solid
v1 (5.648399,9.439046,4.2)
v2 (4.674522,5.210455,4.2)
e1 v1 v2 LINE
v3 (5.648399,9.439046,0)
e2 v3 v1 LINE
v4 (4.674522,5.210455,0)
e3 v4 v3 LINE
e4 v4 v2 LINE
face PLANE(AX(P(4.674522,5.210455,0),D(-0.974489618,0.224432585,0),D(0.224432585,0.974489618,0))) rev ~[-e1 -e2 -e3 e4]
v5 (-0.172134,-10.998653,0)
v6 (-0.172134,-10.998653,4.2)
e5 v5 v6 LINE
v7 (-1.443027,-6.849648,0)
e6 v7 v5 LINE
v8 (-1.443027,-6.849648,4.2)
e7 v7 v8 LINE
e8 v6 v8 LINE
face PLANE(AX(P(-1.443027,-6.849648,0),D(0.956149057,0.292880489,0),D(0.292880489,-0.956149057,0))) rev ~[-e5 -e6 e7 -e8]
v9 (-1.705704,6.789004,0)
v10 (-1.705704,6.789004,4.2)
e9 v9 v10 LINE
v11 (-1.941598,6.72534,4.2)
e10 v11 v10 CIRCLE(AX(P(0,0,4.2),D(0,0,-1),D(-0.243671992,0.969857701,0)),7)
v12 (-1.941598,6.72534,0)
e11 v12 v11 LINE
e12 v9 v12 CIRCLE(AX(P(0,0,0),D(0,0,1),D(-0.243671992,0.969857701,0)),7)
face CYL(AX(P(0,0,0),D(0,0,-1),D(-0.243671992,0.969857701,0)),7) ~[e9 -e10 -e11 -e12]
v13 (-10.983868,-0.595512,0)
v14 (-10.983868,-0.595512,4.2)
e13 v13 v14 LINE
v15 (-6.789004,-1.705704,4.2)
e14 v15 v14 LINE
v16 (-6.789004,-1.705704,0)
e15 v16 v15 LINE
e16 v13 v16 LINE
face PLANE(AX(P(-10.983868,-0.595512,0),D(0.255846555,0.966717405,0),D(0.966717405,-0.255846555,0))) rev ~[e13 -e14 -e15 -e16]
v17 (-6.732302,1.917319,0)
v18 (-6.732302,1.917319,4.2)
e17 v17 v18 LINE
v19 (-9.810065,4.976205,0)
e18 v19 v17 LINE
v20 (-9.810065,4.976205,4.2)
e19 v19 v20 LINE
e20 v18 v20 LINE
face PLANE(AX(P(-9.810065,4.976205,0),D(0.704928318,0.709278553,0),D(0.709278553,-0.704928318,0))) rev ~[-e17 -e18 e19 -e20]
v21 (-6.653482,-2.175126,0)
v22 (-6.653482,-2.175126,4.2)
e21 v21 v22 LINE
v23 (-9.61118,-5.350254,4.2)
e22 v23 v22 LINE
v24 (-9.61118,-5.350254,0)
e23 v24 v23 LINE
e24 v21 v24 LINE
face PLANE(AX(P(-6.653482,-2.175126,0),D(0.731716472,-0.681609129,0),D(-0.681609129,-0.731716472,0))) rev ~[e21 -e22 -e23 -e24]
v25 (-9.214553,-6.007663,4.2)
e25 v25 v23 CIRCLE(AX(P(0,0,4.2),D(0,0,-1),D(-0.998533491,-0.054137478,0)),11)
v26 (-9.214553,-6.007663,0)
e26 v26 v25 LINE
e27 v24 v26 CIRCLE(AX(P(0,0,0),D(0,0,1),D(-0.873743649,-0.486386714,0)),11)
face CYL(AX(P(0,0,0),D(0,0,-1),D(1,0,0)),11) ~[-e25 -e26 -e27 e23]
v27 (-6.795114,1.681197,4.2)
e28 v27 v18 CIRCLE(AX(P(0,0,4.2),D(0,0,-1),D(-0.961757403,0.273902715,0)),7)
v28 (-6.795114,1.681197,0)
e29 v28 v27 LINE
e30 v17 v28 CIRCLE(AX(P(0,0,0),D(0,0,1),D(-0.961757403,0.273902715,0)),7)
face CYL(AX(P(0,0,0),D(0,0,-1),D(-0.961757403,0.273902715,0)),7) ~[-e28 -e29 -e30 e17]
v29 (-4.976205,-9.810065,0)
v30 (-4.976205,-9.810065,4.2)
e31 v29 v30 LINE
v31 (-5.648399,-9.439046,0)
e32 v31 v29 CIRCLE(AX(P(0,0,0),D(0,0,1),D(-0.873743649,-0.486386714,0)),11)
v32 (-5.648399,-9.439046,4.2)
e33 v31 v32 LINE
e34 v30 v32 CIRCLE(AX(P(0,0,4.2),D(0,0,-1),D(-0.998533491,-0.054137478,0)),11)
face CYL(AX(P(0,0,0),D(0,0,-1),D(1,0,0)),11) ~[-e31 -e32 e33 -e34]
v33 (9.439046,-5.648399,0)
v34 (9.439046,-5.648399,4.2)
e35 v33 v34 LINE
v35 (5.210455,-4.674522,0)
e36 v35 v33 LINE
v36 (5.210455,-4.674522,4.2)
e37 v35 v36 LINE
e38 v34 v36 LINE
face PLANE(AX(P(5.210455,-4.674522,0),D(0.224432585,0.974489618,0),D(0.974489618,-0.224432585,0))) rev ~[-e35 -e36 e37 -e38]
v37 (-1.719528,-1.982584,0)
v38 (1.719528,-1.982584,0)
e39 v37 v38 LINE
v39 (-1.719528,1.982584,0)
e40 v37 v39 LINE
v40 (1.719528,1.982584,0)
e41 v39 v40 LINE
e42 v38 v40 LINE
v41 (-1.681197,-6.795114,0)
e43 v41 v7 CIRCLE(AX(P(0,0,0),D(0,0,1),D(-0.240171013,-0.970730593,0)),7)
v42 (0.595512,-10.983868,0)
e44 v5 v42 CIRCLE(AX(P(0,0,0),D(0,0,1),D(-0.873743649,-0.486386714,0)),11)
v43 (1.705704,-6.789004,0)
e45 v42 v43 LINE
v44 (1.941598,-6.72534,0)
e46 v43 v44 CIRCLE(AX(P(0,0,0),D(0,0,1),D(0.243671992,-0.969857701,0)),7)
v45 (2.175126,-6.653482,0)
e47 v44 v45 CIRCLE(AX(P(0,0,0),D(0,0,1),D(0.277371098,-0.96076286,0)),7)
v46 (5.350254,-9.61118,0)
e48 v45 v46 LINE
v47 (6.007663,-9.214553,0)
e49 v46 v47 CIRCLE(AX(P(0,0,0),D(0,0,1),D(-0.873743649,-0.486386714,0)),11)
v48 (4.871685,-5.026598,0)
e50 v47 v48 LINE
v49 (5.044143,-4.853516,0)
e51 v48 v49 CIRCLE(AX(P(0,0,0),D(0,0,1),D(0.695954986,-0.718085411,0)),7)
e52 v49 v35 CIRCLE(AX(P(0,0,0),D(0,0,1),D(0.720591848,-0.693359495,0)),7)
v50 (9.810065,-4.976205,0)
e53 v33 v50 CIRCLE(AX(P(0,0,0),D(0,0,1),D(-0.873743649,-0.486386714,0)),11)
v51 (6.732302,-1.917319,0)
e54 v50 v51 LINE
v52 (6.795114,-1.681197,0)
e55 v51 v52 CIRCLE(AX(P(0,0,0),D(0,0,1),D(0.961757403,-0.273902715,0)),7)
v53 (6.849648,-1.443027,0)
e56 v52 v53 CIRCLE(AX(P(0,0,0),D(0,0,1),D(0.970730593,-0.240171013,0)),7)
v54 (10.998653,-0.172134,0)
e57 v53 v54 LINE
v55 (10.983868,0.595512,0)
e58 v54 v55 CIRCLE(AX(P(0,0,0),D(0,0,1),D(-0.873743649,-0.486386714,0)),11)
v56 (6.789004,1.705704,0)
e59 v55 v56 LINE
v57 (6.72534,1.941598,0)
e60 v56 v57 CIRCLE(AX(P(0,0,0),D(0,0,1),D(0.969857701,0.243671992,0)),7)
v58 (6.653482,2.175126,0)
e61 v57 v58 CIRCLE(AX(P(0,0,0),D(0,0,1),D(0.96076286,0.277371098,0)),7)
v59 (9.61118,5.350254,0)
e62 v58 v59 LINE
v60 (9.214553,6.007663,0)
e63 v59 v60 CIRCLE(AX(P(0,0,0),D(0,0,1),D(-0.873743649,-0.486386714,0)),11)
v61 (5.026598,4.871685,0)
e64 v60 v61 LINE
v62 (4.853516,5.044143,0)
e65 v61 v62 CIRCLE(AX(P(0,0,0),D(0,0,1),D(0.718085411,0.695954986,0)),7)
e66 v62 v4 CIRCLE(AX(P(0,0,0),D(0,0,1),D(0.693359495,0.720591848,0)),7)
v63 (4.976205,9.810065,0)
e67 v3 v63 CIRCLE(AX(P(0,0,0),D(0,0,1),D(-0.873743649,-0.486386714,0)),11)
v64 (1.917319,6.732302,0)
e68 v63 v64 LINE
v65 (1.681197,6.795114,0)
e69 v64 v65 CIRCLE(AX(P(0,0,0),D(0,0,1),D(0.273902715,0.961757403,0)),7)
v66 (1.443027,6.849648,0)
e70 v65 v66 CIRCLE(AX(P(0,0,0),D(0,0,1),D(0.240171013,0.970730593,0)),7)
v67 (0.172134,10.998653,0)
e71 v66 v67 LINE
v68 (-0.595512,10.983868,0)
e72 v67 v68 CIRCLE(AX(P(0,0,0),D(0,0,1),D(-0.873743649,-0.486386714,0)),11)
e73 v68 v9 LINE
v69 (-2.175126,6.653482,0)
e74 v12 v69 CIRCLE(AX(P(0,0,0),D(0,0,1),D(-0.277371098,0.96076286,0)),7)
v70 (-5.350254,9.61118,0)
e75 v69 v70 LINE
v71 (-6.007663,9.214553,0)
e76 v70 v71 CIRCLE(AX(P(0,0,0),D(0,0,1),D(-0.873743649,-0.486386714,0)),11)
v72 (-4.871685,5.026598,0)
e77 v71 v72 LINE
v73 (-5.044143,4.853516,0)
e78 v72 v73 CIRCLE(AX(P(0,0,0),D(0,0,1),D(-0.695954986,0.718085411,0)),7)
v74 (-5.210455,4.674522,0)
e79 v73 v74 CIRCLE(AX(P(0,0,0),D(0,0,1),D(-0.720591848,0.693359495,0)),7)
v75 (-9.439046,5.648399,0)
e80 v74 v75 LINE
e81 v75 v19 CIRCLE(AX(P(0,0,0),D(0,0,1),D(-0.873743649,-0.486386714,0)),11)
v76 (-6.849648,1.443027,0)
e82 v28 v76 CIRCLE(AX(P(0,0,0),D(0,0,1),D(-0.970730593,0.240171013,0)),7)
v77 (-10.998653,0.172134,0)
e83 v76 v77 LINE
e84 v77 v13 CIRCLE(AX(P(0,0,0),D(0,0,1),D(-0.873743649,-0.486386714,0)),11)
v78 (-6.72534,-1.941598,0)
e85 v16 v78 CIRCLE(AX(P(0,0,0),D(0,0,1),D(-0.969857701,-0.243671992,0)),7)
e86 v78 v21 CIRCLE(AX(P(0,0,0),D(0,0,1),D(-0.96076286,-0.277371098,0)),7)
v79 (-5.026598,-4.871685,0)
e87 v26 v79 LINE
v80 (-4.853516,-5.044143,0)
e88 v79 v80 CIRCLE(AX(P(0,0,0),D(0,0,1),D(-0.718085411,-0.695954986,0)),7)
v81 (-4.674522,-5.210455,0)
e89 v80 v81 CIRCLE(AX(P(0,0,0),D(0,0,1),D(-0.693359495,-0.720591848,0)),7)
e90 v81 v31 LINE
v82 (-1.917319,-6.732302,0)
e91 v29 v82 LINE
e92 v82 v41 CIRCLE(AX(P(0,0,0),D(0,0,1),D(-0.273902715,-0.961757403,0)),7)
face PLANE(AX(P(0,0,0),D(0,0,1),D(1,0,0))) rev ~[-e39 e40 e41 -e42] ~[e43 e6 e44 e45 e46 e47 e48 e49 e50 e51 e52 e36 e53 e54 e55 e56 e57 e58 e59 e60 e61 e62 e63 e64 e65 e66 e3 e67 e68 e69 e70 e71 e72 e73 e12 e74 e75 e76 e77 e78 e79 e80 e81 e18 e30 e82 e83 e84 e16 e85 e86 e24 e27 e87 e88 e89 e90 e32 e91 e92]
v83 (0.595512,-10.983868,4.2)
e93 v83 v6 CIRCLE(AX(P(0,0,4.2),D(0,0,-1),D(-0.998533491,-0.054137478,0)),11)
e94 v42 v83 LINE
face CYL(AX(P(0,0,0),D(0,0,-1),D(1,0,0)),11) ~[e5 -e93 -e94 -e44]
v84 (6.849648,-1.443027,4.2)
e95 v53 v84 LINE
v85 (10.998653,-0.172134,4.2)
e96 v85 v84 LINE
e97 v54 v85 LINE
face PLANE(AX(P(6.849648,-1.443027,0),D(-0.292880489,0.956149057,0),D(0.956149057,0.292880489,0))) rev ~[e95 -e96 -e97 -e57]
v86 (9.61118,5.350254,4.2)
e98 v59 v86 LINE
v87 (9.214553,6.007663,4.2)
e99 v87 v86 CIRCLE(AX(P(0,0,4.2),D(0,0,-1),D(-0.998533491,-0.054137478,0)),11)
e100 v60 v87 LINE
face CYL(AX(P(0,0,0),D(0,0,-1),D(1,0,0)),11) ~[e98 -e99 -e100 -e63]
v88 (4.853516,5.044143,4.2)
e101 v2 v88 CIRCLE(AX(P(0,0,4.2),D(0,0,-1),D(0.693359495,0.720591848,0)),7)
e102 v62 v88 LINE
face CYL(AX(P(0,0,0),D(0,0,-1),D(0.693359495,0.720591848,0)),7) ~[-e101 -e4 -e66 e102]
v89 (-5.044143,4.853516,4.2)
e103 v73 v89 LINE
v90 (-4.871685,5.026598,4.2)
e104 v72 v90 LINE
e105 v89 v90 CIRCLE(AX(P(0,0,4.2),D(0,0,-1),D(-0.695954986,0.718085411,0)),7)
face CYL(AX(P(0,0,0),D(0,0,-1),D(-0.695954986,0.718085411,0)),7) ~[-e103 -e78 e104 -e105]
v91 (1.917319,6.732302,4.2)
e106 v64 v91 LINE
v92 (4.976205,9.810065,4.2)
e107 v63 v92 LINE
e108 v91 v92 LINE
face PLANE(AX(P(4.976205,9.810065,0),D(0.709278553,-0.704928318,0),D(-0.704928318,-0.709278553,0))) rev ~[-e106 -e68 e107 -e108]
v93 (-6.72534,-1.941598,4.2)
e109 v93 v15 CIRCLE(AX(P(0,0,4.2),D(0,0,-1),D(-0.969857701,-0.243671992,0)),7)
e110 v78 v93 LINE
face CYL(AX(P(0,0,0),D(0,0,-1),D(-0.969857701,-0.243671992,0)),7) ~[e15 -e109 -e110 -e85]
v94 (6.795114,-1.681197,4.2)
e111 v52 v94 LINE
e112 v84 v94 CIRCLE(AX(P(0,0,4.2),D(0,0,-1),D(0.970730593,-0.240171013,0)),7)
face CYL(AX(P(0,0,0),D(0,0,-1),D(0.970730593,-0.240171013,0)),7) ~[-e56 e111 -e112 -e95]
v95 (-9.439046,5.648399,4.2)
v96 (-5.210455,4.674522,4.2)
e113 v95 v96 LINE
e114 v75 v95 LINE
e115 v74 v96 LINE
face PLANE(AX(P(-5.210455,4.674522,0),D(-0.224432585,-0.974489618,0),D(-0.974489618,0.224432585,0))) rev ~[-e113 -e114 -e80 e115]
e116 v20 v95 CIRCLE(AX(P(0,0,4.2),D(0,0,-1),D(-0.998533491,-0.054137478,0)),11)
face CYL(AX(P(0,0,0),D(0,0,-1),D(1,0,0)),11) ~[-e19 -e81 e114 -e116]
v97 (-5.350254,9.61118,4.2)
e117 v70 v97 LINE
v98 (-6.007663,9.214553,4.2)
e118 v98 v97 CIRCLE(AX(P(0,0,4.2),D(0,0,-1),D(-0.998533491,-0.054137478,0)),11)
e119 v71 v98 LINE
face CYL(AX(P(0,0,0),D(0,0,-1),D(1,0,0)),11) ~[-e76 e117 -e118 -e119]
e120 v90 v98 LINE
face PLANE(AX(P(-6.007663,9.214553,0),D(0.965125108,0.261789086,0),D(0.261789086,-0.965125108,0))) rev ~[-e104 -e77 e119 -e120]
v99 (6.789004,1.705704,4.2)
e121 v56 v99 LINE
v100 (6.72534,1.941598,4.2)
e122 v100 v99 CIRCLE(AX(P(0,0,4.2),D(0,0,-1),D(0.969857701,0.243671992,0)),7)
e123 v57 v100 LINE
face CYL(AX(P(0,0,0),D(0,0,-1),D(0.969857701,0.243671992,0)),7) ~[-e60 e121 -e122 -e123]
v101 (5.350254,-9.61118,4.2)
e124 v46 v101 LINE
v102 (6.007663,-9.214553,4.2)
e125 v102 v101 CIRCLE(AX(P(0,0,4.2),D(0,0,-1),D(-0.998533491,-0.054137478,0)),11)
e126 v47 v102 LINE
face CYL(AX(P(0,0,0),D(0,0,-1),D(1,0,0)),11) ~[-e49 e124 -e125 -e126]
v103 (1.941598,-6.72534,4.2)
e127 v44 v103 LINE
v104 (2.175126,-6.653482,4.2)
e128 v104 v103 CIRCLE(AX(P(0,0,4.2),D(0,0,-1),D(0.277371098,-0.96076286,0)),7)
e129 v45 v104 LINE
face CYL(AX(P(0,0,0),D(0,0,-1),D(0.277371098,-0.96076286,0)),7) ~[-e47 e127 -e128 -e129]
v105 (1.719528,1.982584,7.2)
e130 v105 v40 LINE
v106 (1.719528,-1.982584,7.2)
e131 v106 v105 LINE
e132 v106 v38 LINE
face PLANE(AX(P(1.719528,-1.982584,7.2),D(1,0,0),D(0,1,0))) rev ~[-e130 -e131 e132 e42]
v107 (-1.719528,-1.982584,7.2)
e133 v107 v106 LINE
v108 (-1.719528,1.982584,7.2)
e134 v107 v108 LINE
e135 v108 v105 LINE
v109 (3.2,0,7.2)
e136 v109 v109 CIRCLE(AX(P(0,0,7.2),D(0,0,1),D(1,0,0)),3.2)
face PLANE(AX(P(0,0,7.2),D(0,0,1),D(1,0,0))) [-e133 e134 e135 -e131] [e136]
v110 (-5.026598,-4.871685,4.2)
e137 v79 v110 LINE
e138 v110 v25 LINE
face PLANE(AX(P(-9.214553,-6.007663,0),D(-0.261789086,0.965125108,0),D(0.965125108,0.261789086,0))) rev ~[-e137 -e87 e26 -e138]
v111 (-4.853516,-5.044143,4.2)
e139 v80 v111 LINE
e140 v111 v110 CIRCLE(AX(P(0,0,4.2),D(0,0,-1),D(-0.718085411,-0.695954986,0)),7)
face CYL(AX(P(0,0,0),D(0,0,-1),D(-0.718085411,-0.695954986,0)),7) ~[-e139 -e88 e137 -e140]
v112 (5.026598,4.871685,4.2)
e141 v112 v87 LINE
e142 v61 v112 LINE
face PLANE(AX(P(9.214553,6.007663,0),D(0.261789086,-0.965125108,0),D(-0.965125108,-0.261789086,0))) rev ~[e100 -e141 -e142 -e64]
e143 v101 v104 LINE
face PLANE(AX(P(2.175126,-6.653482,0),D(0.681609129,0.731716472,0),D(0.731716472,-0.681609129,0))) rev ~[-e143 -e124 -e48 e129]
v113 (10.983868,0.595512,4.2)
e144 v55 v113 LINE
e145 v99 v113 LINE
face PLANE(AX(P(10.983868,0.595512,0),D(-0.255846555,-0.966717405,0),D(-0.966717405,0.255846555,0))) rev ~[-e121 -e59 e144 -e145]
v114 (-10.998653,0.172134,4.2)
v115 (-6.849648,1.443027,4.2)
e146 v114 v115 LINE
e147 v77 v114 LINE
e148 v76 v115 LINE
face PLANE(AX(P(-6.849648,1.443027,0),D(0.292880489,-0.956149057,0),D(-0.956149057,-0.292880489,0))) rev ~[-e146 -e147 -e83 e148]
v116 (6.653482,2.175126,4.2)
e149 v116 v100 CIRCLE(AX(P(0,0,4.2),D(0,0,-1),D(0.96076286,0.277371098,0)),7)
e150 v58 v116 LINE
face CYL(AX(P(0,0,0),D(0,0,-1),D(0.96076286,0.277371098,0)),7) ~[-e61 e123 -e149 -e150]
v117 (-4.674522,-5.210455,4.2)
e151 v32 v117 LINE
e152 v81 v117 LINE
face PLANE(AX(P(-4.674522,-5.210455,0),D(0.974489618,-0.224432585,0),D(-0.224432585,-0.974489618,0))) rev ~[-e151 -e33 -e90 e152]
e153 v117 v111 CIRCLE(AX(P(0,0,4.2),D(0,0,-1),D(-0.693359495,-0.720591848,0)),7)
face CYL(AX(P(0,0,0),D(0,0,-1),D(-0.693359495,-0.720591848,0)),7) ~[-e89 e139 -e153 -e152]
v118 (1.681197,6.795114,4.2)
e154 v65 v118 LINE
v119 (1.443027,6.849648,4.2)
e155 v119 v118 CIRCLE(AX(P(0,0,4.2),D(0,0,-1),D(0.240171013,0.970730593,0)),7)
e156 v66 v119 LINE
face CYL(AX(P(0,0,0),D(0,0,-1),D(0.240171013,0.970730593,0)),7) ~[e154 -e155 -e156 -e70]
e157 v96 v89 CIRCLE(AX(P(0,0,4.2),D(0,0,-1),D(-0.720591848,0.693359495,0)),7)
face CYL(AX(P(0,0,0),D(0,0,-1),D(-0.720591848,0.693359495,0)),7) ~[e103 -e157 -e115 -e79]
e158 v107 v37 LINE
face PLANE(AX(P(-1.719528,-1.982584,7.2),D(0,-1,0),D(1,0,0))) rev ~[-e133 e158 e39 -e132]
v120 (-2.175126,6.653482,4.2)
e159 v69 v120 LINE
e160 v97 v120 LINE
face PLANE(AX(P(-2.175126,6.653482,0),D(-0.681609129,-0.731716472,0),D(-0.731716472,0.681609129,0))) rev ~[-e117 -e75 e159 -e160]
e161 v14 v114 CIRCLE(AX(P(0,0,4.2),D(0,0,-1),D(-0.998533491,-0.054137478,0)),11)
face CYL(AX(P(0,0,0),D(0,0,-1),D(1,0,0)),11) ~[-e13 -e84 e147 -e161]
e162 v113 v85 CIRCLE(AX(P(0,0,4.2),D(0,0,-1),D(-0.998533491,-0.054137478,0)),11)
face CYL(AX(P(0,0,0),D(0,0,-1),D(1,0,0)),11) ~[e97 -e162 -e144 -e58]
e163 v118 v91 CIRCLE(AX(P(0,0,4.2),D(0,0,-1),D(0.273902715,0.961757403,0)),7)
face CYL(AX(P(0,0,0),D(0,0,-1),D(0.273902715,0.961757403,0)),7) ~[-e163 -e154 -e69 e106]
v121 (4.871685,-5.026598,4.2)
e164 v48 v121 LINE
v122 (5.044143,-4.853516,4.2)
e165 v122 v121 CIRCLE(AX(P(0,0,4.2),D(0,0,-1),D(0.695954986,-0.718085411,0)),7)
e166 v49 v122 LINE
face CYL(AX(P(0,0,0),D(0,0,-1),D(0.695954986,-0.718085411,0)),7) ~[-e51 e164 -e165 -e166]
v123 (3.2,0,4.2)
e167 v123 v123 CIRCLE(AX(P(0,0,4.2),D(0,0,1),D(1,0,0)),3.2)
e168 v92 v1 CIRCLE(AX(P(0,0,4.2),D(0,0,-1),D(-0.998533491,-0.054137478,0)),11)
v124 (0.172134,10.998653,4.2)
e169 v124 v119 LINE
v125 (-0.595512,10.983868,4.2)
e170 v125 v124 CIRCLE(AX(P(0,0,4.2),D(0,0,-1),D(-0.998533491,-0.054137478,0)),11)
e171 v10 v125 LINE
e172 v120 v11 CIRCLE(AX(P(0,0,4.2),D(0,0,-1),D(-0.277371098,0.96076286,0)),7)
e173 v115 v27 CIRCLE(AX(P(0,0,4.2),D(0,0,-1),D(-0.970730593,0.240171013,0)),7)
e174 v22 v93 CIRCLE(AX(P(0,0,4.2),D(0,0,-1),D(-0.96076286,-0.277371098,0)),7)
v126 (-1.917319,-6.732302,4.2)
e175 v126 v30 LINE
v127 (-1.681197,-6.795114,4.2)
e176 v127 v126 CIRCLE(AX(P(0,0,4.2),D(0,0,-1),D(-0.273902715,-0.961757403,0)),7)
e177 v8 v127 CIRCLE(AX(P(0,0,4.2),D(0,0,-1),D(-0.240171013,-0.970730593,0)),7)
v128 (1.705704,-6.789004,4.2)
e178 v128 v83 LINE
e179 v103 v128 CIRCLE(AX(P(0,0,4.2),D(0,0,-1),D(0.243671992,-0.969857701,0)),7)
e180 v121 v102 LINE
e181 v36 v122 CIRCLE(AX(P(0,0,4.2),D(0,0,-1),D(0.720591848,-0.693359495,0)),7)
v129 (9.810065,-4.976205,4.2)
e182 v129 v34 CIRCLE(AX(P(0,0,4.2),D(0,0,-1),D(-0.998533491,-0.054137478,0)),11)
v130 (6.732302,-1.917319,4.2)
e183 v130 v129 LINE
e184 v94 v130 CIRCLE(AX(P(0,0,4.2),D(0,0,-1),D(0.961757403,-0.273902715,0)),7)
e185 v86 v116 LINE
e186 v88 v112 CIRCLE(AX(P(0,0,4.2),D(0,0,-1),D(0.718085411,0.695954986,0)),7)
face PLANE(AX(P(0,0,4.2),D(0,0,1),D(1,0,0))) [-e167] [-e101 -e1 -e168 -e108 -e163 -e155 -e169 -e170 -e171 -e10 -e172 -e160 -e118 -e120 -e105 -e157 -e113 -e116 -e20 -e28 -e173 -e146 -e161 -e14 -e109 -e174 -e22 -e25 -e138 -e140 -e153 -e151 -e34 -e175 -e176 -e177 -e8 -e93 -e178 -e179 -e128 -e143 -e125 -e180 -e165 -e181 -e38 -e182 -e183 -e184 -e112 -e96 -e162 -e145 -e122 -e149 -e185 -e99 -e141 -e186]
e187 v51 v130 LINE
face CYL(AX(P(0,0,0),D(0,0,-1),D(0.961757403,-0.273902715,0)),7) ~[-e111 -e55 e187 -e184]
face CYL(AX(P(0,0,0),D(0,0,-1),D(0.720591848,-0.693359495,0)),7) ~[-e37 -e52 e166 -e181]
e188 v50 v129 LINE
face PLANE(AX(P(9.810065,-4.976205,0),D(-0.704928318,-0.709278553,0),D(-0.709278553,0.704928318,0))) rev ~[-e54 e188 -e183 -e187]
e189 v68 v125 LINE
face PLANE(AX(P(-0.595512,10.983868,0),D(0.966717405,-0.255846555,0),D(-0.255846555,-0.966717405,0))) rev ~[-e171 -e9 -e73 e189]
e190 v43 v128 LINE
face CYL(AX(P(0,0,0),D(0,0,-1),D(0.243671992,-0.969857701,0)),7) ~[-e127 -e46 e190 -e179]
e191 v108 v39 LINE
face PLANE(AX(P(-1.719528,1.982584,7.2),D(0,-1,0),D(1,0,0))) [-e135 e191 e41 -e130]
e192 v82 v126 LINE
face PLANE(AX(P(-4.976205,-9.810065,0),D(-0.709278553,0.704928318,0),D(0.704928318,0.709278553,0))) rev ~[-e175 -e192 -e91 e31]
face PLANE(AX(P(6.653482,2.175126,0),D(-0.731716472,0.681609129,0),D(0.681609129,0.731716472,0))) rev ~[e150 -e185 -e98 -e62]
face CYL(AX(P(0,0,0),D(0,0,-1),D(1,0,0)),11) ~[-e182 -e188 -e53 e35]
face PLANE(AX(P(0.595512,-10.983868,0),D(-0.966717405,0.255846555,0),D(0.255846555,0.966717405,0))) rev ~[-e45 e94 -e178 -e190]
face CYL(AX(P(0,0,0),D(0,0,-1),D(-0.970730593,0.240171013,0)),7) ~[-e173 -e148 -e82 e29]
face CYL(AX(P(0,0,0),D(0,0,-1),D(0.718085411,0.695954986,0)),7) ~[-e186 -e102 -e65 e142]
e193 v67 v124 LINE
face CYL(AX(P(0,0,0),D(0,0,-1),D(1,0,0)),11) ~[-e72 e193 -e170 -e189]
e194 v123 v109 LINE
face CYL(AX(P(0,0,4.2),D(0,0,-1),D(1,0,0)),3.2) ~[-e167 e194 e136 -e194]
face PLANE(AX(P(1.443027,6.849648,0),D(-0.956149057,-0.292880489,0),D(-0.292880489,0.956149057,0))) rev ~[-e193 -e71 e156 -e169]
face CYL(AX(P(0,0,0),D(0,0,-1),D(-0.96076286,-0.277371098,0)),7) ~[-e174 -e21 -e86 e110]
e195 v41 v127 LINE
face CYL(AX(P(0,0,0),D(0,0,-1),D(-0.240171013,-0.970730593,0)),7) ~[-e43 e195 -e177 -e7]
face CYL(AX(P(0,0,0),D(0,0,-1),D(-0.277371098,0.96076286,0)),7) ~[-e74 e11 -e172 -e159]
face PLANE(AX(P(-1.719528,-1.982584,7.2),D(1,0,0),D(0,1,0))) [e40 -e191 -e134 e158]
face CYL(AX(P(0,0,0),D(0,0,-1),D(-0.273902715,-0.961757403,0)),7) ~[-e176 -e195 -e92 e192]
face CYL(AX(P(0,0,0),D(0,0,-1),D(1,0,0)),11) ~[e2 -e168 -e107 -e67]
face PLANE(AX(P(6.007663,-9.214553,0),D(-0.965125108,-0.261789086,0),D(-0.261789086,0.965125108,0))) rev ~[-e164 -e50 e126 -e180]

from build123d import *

# Parameters (mm, degrees)
F0_R            = 11
F1_DEPTH        = 4.2
F3_DEPTH        = 4.201
F3_COPIES_COUNT = 12
F5_R            = 3.2
F6_DEPTH        = 3
F7_W            = 3.4390550572
F7_H            = 3.9651677944
F8_DEPTH        = 7.201


# Not quite as in the source:
# - a pattern or mirror of a feature is missing from the dataset's text; its kind, count and spacing are read off the source's solid


with BuildPart() as f1:
    # F0 (on Top) → F1 (new body)
    with BuildSketch(Plane.XY):
        Circle(F0_R)
    extrude(amount=F1_DEPTH)

    # F2 (on face) → F3 (cut, through all)
    with BuildSketch(Plane(origin=(0, 0, 0), x_dir=(1, 0, 0), z_dir=(0, 0, -1))):
        with BuildLine():
            Line((-10.5683914605, 3.0510820928), (-6.7253400203, 1.9415976954))
            ThreePointArc((-6.7253400203, 1.9415976954), (-6.6904301664, 2.0586753481), (-6.6534823425, 2.1751259084))
            Line((-6.6534823425, 2.1751259084), (-9.6111801384, 5.3502538582))
            ThreePointArc((-9.6111801384, 5.3502538582), (-10.1550640166, 4.2278451744), (-10.5683914605, 3.0510820928))
        make_face()
        with BuildLine():
            ThreePointArc((-6.7890039073, 1.7057039447), (-6.7582012706, 1.8239286132), (-6.7253400203, 1.9415976954))
            Line((-6.7253400203, 1.9415976954), (-10.5683914605, 3.0510820928))
            ThreePointArc((-10.5683914605, 3.0510820928), (-10.8458486133, 1.8350934191), (-10.9838684057, 0.5955122546))
            Line((-10.9838684057, 0.5955122546), (-6.7890039073, 1.7057039447))
        make_face()
    f3 = extrude(amount=-F3_DEPTH, mode=Mode.SUBTRACT)

    # F3_copies: F3 ×12 about axis
    f3_copies_axis = Axis((0, 0, 0), (0, 0, 1))
    for i in range(1, F3_COPIES_COUNT):
        add(f3.rotate(f3_copies_axis, i * 360 / F3_COPIES_COUNT), mode=Mode.SUBTRACT)

    # F5 (on face) → F6 (join)
    with BuildSketch(Plane.XY.offset(4.2)):
        Circle(F5_R)
    extrude(amount=F6_DEPTH)

    # F7 (on face) → F8 (cut, through all)
    with BuildSketch(Plane.XY.offset(7.2)):
        Rectangle(F7_W, F7_H)
    extrude(amount=-F8_DEPTH, mode=Mode.SUBTRACT)


solid = f1.part
